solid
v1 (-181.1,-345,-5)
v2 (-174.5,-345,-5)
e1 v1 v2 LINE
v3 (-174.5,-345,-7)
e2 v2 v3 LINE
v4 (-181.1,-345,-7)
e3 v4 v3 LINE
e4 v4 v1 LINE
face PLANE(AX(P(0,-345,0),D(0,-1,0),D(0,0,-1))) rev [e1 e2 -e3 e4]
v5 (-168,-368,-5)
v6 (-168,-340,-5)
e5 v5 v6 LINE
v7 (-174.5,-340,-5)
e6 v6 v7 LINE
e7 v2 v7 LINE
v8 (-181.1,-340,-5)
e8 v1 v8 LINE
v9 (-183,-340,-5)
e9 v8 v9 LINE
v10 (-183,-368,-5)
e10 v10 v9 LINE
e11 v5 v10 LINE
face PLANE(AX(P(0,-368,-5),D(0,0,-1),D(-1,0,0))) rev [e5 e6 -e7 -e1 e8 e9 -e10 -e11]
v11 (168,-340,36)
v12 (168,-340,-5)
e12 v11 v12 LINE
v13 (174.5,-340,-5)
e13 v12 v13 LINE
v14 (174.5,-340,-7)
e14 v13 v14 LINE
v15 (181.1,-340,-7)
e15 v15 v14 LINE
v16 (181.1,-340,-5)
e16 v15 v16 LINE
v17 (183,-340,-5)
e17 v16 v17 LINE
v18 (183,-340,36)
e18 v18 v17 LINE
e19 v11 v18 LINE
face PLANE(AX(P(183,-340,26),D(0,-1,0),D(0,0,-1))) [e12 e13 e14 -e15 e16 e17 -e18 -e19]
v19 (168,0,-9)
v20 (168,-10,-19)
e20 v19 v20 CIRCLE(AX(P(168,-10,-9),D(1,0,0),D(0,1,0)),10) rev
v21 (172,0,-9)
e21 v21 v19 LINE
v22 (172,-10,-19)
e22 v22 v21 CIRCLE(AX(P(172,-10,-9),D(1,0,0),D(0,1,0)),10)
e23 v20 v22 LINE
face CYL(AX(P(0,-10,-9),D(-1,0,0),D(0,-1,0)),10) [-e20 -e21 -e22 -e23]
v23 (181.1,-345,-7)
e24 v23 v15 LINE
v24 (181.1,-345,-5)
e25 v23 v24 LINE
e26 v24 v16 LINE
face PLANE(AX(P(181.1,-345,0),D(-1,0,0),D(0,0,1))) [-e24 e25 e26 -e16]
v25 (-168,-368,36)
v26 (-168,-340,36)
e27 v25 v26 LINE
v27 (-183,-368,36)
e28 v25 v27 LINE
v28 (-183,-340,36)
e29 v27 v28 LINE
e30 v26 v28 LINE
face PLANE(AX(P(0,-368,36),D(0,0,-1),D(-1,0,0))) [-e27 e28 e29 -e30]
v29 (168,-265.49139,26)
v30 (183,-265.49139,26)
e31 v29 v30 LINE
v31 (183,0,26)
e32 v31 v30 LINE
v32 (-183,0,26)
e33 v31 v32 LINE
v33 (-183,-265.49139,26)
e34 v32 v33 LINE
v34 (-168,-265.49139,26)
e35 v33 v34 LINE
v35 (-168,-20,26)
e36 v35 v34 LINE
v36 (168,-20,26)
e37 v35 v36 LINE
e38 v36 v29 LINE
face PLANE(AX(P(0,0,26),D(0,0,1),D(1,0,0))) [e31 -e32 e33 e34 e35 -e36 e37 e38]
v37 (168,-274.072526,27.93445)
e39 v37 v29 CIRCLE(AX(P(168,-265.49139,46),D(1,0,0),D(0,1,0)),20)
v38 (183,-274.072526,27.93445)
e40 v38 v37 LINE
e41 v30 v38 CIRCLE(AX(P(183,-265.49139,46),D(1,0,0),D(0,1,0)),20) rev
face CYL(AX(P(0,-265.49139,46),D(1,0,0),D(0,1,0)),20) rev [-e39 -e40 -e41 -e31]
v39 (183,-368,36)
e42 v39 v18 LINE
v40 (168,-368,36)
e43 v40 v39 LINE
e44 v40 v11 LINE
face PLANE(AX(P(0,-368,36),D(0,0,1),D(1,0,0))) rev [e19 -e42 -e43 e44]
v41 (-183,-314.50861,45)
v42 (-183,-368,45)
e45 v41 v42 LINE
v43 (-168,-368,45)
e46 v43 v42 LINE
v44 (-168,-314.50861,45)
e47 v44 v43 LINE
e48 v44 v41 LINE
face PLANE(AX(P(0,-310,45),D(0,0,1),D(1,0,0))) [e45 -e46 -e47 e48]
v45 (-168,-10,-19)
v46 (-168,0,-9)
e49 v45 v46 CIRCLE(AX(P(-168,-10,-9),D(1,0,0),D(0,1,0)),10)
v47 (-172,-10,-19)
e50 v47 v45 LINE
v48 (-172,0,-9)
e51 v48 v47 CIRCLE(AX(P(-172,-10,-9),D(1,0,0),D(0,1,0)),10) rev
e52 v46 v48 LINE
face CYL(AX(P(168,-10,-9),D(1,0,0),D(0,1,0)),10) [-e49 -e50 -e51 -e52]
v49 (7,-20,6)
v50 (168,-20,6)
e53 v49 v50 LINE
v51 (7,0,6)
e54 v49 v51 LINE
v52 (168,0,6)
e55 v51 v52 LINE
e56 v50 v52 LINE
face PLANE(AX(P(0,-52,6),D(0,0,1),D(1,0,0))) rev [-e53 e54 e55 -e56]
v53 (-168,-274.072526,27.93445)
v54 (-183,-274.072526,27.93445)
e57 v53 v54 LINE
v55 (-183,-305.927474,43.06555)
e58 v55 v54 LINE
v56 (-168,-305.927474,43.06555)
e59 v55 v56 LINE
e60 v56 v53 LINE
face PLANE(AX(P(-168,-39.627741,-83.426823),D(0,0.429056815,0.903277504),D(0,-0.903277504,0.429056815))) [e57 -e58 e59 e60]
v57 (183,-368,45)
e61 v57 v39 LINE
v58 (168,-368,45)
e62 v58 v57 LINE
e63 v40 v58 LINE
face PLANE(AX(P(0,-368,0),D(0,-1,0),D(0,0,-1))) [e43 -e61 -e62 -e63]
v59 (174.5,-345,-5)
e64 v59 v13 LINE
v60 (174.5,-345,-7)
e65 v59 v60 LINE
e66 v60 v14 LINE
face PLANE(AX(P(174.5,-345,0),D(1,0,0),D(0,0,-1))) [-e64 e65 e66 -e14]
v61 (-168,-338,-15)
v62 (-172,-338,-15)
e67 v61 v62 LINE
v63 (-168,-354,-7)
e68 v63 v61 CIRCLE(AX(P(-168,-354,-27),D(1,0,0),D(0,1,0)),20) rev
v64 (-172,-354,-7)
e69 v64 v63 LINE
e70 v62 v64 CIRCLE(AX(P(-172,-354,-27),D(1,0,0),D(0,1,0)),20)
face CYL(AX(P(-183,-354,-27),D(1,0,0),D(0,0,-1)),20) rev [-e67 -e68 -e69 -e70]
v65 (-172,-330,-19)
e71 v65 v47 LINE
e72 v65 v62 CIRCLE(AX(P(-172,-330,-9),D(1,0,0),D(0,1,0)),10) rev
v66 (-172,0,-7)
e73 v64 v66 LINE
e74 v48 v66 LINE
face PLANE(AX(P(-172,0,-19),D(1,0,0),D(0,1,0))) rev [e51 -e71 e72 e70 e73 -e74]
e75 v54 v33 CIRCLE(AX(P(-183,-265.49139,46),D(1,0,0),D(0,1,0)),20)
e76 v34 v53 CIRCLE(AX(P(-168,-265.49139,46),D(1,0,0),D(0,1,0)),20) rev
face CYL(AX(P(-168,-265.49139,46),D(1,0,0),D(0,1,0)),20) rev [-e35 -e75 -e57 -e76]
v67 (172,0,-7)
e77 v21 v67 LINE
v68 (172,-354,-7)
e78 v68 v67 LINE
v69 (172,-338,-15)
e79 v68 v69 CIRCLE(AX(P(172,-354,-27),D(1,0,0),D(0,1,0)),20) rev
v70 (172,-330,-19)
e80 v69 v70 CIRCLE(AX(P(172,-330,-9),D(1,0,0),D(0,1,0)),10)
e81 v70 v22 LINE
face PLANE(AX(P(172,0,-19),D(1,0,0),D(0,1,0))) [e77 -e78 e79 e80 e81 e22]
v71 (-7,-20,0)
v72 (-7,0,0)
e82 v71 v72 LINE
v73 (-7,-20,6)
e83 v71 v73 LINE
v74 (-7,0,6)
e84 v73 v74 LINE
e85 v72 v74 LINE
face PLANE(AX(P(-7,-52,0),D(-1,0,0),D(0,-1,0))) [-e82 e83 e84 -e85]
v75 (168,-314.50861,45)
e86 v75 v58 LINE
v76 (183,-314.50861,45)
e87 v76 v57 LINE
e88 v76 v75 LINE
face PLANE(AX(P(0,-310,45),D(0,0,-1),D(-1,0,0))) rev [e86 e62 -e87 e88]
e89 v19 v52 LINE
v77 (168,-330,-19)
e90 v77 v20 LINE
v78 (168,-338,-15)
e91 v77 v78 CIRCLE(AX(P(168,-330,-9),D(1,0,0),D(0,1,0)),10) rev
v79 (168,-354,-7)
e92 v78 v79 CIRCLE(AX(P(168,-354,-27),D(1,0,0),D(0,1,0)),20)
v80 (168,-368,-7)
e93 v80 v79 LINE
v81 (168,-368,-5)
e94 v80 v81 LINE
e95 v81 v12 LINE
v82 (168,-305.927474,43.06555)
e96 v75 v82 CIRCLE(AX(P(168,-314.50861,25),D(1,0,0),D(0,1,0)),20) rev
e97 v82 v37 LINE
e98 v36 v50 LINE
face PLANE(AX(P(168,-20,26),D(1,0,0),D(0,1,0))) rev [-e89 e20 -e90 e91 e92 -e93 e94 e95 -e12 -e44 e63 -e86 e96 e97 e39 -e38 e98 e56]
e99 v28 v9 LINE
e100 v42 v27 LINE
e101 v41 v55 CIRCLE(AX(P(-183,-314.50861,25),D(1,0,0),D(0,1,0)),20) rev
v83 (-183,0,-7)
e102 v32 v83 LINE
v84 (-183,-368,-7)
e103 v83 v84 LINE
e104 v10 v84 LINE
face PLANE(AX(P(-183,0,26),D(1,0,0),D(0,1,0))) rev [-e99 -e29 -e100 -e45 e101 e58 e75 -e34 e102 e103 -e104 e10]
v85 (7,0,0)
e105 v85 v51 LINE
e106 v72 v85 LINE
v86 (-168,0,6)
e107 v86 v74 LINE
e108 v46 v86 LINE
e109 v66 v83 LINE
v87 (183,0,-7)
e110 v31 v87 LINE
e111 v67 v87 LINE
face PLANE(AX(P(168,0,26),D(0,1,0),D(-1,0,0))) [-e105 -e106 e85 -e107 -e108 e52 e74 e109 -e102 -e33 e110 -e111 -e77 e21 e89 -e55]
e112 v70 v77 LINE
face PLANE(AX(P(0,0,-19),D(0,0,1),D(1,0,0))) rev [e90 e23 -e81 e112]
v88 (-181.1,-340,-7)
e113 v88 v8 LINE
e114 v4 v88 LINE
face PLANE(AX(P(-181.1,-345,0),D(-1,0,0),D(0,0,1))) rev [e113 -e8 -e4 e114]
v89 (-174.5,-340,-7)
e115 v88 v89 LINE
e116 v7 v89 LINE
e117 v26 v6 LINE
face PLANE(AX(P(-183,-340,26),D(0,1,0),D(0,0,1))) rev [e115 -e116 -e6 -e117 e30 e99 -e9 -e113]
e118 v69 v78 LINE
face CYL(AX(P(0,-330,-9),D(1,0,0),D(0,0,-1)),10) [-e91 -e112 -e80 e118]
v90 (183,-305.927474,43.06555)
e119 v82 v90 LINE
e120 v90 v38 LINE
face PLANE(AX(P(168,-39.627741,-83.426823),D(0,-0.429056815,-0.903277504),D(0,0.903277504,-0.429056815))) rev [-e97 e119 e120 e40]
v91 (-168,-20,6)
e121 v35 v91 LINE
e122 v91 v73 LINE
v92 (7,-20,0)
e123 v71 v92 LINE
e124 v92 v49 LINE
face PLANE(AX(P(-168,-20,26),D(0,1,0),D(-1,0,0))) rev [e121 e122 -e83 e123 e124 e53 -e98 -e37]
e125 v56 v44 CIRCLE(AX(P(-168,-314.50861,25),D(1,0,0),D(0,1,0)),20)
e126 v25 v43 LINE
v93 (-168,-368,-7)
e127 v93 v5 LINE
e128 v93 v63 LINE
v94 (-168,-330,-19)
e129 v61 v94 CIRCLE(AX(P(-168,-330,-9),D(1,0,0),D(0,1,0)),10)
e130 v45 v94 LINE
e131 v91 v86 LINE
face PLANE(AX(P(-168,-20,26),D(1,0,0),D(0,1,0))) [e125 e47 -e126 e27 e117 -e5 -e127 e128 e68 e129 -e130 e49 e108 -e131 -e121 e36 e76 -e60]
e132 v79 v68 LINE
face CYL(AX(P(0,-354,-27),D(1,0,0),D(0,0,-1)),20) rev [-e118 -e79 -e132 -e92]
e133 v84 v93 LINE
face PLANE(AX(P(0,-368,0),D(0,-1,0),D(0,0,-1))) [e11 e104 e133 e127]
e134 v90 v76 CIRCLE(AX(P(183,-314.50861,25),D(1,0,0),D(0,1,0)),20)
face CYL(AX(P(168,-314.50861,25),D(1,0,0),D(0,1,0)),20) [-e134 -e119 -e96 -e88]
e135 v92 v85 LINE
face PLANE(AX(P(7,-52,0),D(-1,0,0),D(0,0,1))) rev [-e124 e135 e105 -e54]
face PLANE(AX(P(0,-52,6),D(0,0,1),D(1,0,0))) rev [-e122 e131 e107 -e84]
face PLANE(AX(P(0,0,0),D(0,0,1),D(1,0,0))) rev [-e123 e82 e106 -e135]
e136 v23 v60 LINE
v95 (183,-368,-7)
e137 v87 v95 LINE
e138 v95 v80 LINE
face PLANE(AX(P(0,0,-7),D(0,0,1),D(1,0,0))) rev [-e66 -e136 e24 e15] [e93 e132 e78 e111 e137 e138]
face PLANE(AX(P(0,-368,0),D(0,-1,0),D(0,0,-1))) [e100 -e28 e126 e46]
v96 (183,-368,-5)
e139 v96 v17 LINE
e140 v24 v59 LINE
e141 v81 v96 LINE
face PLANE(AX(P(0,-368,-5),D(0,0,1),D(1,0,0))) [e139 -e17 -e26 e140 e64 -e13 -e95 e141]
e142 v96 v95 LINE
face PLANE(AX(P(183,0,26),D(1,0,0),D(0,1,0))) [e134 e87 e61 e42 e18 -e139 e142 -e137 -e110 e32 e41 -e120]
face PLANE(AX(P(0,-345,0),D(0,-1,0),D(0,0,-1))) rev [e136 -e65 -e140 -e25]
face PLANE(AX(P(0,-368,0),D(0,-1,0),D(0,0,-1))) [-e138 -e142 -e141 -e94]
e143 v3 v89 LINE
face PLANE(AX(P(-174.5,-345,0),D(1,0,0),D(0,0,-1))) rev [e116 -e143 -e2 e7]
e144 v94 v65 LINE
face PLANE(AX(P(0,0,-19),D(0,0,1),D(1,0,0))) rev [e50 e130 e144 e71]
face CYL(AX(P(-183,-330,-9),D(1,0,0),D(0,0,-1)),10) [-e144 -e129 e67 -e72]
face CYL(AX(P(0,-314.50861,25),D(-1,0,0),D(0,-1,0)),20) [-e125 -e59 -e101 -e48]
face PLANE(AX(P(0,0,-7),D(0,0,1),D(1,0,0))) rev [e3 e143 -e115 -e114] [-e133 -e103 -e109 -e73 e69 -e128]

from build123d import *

# Parameters (mm, degrees)
EXTRUDE_1_DEPTH        = 26
EXTRUDE_2_DEPTH        = 19
FILLET_1_R             = 10
SKETCH_5_W             = 161
SKETCH_5_H             = 6
CUT_EXTRUDE_1_DEPTH    = 52
SKETCH_1_5_W           = 11
SKETCH_1_5_H           = 340
EXTRUDE_4_DEPTH        = 7
SKETCH_6_W             = 1.9
SKETCH_6_H             = 2
SKETCH_6_W_2           = 6.6
EXTRUDE_5_DEPTH        = 28
SKETCH_6_3_W           = 6.6
SKETCH_6_3_H           = 2
CUT_EXTRUDE_2_DEPTH    = 5
FILLET_2_R             = 20
SKETCH_6_4_W           = 15
SKETCH_6_4_H           = 10
SKETCH_6_4_H_2         = 9
EXTRUDE_6_DEPTH        = 30
SKETCH_6_5_W           = 15
SKETCH_6_5_H           = 9
EXTRUDE_7_DEPTH        = 28
EXTRUDE_8_DEPTH        = 15
FILLET_3_R             = 20
FILLET_3_OF_MIRROR_2_R = 20
FILLET_4_R             = 20


with BuildPart() as part:
    # 스케치1 → 보스-돌출1 (new body)
    with BuildSketch(Plane.XY):
        Polygon((-168, 0), (168, 0), (183, 0), (183, -340), (168, -340), (168, -20), (-168, -20), (-168, -340), (-183, -340), (-183, 0), align=None)
    extrude(amount=EXTRUDE_1_DEPTH)

    # 스케치1<4> → 보스-돌출2 (add)
    with BuildSketch(Plane.XY):
        Polygon((172, 0), (168, 0), (168, -20), (168, -340), (172, -340), align=None)
        Polygon((-168, -20), (-168, 0), (-172, 0), (-172, -340), (-168, -340), align=None)
    extrude(amount=-EXTRUDE_2_DEPTH)

    # 필렛1
    fillet_1_edges = [part.edges().sort_by_distance(p)[0] for p in [
        (170, 0, -19),
        (170, -340, -19),
        (-170, -340, -19),
        (-170, 0, -19),
    ]]
    fillet(fillet_1_edges, radius=FILLET_1_R)

    # 스케치5 → 컷-돌출1 (cut)
    with BuildSketch(Plane(origin=(0, 0, 0), x_dir=(1, 0, 0), z_dir=(0, 1, 0))):
        with Locations((-87.5, -3)):
            Rectangle(SKETCH_5_W, SKETCH_5_H)
        with Locations((87.5, -3)):
            Rectangle(SKETCH_5_W, SKETCH_5_H)
    extrude(amount=-CUT_EXTRUDE_1_DEPTH, mode=Mode.SUBTRACT)

    # 스케치1<5> → 보스-돌출4 (add)
    with BuildSketch(Plane.XY):
        with Locations((177.5, -170)):
            Rectangle(SKETCH_1_5_W, SKETCH_1_5_H)
        with Locations((-177.5, -170)):
            Rectangle(SKETCH_1_5_W, SKETCH_1_5_H)
    extrude(amount=-EXTRUDE_4_DEPTH)

    # 스케치6 → 보스-돌출5 (add)
    with BuildSketch(Plane.XZ.offset(340)):
        with Locations((-182.05, -6)):
            Rectangle(SKETCH_6_W, SKETCH_6_H)
        with Locations((-177.8, -6)):
            Rectangle(SKETCH_6_W_2, SKETCH_6_H)
        Polygon((-174.5, -7), (-172, -7), (-168, -7), (-168, -5), (-174.5, -5), align=None)
    extrude_5 = extrude(amount=EXTRUDE_5_DEPTH)

    # 스케치6<3> → 컷-돌출2 (cut)
    with BuildSketch(Plane.XZ.offset(340)):
        with Locations((-177.8, -6)):
            Rectangle(SKETCH_6_3_W, SKETCH_6_3_H)
    cut_extrude_2 = extrude(amount=CUT_EXTRUDE_2_DEPTH, mode=Mode.SUBTRACT)

    # 필렛2
    # the kernel refuses this fillet: 20 mm, written as the material it adds along each edge
    with BuildSketch(Plane(origin=(-172, -340, -7), x_dir=(0, -1, 0), z_dir=(1, 0, 0))) as fillet_2_piece_1:
        with BuildLine():
            CenterArc((14, 20), FILLET_2_R, 216.869897646, 53.130102354)
            Line((-2, 8), (-3.6, 6.8))
            ThreePointArc((-3.6, 6.8), (-2, 2), (-2, 0))
            Line((-2, 0), (0, -2))
            Line((0, -2), (14, -2))
            Line((14, -2), (14, 0))
        make_face()
    extrude(amount=4)

    # 스케치6<4> → 보스-돌출6 (add)
    with BuildSketch(Plane.XZ.offset(340)):
        with Locations((-175.5, 31)):
            Rectangle(SKETCH_6_4_W, SKETCH_6_4_H)
        with Locations((-175.5, 40.5)):
            Rectangle(SKETCH_6_4_W, SKETCH_6_4_H_2)
    extrude_6 = extrude(amount=-EXTRUDE_6_DEPTH)

    # 스케치6<5> → 보스-돌출7 (add)
    with BuildSketch(Plane.XZ.offset(340)):
        with Locations((-175.5, 40.5)):
            Rectangle(SKETCH_6_5_W, SKETCH_6_5_H)
    extrude_7 = extrude(amount=EXTRUDE_7_DEPTH)

    # 스케치9 → 보스-돌출8 (add)
    with BuildSketch(Plane.ZY.offset(183)):
        Polygon((26, -310), (45, -310), (26, -270), align=None)
    extrude_8 = extrude(amount=-EXTRUDE_8_DEPTH)

    # 필렛3
    fillet_3_edges = [part.edges().sort_by_distance(p)[0] for p in [
        (-175.5, -310, 45),
        (-175.5, -270, 26),
    ]]
    fillet(fillet_3_edges, radius=FILLET_3_R)

    # 대칭 복사2: 보스-돌출5, 컷-돌출2, 보스-돌출6, 보스-돌출7, 보스-돌출8 across plane
    add(extrude_5.mirror(Plane(origin=(0, 0, 0), x_dir=(0, 0, 1), z_dir=(1, 0, 0))))
    add(cut_extrude_2.mirror(Plane(origin=(0, 0, 0), x_dir=(0, 0, 1), z_dir=(1, 0, 0))), mode=Mode.SUBTRACT)
    add(extrude_6.mirror(Plane(origin=(0, 0, 0), x_dir=(0, 0, 1), z_dir=(1, 0, 0))))
    add(extrude_7.mirror(Plane(origin=(0, 0, 0), x_dir=(0, 0, 1), z_dir=(1, 0, 0))))
    add(extrude_8.mirror(Plane(origin=(0, 0, 0), x_dir=(0, 0, 1), z_dir=(1, 0, 0))))

    # 필렛3 of 대칭 복사2
    fillet_3_of_mirror_2_edges = [part.edges().sort_by_distance(p)[0] for p in [
        (175.5, -310, 45),
        (175.5, -270, 26),
    ]]
    fillet(fillet_3_of_mirror_2_edges, radius=FILLET_3_OF_MIRROR_2_R)

    # 필렛4
    # the kernel refuses this fillet: 20 mm, written as the material it adds along each edge
    with BuildSketch(Plane(origin=(172, -340, -7), x_dir=(0, 0.24253562503633938, -0.9701425001453302), z_dir=(-1, 0, 0))) as fillet_4_piece_1:
        with BuildLine():
            CenterArc((16.007351252, 18.432707503), FILLET_4_R, 194.036243468, 53.130102354)
            Line((-3.395498751, 13.581995002), (-5.335783751, 13.096923752))
            Line((-5.335783751, 13.096923752), (-1.940285, -0.48507125))
            Line((-1.940285, -0.48507125), (0.48507125, -1.940285))
            ThreePointArc((0.48507125, -1.940285), (2.42535625, -1.45521375), (7.470097251, -1.84327075))
            Line((7.470097251, -1.84327075), (8.246211251, 0))
        make_face()
    extrude(amount=4)


solid = part.part
